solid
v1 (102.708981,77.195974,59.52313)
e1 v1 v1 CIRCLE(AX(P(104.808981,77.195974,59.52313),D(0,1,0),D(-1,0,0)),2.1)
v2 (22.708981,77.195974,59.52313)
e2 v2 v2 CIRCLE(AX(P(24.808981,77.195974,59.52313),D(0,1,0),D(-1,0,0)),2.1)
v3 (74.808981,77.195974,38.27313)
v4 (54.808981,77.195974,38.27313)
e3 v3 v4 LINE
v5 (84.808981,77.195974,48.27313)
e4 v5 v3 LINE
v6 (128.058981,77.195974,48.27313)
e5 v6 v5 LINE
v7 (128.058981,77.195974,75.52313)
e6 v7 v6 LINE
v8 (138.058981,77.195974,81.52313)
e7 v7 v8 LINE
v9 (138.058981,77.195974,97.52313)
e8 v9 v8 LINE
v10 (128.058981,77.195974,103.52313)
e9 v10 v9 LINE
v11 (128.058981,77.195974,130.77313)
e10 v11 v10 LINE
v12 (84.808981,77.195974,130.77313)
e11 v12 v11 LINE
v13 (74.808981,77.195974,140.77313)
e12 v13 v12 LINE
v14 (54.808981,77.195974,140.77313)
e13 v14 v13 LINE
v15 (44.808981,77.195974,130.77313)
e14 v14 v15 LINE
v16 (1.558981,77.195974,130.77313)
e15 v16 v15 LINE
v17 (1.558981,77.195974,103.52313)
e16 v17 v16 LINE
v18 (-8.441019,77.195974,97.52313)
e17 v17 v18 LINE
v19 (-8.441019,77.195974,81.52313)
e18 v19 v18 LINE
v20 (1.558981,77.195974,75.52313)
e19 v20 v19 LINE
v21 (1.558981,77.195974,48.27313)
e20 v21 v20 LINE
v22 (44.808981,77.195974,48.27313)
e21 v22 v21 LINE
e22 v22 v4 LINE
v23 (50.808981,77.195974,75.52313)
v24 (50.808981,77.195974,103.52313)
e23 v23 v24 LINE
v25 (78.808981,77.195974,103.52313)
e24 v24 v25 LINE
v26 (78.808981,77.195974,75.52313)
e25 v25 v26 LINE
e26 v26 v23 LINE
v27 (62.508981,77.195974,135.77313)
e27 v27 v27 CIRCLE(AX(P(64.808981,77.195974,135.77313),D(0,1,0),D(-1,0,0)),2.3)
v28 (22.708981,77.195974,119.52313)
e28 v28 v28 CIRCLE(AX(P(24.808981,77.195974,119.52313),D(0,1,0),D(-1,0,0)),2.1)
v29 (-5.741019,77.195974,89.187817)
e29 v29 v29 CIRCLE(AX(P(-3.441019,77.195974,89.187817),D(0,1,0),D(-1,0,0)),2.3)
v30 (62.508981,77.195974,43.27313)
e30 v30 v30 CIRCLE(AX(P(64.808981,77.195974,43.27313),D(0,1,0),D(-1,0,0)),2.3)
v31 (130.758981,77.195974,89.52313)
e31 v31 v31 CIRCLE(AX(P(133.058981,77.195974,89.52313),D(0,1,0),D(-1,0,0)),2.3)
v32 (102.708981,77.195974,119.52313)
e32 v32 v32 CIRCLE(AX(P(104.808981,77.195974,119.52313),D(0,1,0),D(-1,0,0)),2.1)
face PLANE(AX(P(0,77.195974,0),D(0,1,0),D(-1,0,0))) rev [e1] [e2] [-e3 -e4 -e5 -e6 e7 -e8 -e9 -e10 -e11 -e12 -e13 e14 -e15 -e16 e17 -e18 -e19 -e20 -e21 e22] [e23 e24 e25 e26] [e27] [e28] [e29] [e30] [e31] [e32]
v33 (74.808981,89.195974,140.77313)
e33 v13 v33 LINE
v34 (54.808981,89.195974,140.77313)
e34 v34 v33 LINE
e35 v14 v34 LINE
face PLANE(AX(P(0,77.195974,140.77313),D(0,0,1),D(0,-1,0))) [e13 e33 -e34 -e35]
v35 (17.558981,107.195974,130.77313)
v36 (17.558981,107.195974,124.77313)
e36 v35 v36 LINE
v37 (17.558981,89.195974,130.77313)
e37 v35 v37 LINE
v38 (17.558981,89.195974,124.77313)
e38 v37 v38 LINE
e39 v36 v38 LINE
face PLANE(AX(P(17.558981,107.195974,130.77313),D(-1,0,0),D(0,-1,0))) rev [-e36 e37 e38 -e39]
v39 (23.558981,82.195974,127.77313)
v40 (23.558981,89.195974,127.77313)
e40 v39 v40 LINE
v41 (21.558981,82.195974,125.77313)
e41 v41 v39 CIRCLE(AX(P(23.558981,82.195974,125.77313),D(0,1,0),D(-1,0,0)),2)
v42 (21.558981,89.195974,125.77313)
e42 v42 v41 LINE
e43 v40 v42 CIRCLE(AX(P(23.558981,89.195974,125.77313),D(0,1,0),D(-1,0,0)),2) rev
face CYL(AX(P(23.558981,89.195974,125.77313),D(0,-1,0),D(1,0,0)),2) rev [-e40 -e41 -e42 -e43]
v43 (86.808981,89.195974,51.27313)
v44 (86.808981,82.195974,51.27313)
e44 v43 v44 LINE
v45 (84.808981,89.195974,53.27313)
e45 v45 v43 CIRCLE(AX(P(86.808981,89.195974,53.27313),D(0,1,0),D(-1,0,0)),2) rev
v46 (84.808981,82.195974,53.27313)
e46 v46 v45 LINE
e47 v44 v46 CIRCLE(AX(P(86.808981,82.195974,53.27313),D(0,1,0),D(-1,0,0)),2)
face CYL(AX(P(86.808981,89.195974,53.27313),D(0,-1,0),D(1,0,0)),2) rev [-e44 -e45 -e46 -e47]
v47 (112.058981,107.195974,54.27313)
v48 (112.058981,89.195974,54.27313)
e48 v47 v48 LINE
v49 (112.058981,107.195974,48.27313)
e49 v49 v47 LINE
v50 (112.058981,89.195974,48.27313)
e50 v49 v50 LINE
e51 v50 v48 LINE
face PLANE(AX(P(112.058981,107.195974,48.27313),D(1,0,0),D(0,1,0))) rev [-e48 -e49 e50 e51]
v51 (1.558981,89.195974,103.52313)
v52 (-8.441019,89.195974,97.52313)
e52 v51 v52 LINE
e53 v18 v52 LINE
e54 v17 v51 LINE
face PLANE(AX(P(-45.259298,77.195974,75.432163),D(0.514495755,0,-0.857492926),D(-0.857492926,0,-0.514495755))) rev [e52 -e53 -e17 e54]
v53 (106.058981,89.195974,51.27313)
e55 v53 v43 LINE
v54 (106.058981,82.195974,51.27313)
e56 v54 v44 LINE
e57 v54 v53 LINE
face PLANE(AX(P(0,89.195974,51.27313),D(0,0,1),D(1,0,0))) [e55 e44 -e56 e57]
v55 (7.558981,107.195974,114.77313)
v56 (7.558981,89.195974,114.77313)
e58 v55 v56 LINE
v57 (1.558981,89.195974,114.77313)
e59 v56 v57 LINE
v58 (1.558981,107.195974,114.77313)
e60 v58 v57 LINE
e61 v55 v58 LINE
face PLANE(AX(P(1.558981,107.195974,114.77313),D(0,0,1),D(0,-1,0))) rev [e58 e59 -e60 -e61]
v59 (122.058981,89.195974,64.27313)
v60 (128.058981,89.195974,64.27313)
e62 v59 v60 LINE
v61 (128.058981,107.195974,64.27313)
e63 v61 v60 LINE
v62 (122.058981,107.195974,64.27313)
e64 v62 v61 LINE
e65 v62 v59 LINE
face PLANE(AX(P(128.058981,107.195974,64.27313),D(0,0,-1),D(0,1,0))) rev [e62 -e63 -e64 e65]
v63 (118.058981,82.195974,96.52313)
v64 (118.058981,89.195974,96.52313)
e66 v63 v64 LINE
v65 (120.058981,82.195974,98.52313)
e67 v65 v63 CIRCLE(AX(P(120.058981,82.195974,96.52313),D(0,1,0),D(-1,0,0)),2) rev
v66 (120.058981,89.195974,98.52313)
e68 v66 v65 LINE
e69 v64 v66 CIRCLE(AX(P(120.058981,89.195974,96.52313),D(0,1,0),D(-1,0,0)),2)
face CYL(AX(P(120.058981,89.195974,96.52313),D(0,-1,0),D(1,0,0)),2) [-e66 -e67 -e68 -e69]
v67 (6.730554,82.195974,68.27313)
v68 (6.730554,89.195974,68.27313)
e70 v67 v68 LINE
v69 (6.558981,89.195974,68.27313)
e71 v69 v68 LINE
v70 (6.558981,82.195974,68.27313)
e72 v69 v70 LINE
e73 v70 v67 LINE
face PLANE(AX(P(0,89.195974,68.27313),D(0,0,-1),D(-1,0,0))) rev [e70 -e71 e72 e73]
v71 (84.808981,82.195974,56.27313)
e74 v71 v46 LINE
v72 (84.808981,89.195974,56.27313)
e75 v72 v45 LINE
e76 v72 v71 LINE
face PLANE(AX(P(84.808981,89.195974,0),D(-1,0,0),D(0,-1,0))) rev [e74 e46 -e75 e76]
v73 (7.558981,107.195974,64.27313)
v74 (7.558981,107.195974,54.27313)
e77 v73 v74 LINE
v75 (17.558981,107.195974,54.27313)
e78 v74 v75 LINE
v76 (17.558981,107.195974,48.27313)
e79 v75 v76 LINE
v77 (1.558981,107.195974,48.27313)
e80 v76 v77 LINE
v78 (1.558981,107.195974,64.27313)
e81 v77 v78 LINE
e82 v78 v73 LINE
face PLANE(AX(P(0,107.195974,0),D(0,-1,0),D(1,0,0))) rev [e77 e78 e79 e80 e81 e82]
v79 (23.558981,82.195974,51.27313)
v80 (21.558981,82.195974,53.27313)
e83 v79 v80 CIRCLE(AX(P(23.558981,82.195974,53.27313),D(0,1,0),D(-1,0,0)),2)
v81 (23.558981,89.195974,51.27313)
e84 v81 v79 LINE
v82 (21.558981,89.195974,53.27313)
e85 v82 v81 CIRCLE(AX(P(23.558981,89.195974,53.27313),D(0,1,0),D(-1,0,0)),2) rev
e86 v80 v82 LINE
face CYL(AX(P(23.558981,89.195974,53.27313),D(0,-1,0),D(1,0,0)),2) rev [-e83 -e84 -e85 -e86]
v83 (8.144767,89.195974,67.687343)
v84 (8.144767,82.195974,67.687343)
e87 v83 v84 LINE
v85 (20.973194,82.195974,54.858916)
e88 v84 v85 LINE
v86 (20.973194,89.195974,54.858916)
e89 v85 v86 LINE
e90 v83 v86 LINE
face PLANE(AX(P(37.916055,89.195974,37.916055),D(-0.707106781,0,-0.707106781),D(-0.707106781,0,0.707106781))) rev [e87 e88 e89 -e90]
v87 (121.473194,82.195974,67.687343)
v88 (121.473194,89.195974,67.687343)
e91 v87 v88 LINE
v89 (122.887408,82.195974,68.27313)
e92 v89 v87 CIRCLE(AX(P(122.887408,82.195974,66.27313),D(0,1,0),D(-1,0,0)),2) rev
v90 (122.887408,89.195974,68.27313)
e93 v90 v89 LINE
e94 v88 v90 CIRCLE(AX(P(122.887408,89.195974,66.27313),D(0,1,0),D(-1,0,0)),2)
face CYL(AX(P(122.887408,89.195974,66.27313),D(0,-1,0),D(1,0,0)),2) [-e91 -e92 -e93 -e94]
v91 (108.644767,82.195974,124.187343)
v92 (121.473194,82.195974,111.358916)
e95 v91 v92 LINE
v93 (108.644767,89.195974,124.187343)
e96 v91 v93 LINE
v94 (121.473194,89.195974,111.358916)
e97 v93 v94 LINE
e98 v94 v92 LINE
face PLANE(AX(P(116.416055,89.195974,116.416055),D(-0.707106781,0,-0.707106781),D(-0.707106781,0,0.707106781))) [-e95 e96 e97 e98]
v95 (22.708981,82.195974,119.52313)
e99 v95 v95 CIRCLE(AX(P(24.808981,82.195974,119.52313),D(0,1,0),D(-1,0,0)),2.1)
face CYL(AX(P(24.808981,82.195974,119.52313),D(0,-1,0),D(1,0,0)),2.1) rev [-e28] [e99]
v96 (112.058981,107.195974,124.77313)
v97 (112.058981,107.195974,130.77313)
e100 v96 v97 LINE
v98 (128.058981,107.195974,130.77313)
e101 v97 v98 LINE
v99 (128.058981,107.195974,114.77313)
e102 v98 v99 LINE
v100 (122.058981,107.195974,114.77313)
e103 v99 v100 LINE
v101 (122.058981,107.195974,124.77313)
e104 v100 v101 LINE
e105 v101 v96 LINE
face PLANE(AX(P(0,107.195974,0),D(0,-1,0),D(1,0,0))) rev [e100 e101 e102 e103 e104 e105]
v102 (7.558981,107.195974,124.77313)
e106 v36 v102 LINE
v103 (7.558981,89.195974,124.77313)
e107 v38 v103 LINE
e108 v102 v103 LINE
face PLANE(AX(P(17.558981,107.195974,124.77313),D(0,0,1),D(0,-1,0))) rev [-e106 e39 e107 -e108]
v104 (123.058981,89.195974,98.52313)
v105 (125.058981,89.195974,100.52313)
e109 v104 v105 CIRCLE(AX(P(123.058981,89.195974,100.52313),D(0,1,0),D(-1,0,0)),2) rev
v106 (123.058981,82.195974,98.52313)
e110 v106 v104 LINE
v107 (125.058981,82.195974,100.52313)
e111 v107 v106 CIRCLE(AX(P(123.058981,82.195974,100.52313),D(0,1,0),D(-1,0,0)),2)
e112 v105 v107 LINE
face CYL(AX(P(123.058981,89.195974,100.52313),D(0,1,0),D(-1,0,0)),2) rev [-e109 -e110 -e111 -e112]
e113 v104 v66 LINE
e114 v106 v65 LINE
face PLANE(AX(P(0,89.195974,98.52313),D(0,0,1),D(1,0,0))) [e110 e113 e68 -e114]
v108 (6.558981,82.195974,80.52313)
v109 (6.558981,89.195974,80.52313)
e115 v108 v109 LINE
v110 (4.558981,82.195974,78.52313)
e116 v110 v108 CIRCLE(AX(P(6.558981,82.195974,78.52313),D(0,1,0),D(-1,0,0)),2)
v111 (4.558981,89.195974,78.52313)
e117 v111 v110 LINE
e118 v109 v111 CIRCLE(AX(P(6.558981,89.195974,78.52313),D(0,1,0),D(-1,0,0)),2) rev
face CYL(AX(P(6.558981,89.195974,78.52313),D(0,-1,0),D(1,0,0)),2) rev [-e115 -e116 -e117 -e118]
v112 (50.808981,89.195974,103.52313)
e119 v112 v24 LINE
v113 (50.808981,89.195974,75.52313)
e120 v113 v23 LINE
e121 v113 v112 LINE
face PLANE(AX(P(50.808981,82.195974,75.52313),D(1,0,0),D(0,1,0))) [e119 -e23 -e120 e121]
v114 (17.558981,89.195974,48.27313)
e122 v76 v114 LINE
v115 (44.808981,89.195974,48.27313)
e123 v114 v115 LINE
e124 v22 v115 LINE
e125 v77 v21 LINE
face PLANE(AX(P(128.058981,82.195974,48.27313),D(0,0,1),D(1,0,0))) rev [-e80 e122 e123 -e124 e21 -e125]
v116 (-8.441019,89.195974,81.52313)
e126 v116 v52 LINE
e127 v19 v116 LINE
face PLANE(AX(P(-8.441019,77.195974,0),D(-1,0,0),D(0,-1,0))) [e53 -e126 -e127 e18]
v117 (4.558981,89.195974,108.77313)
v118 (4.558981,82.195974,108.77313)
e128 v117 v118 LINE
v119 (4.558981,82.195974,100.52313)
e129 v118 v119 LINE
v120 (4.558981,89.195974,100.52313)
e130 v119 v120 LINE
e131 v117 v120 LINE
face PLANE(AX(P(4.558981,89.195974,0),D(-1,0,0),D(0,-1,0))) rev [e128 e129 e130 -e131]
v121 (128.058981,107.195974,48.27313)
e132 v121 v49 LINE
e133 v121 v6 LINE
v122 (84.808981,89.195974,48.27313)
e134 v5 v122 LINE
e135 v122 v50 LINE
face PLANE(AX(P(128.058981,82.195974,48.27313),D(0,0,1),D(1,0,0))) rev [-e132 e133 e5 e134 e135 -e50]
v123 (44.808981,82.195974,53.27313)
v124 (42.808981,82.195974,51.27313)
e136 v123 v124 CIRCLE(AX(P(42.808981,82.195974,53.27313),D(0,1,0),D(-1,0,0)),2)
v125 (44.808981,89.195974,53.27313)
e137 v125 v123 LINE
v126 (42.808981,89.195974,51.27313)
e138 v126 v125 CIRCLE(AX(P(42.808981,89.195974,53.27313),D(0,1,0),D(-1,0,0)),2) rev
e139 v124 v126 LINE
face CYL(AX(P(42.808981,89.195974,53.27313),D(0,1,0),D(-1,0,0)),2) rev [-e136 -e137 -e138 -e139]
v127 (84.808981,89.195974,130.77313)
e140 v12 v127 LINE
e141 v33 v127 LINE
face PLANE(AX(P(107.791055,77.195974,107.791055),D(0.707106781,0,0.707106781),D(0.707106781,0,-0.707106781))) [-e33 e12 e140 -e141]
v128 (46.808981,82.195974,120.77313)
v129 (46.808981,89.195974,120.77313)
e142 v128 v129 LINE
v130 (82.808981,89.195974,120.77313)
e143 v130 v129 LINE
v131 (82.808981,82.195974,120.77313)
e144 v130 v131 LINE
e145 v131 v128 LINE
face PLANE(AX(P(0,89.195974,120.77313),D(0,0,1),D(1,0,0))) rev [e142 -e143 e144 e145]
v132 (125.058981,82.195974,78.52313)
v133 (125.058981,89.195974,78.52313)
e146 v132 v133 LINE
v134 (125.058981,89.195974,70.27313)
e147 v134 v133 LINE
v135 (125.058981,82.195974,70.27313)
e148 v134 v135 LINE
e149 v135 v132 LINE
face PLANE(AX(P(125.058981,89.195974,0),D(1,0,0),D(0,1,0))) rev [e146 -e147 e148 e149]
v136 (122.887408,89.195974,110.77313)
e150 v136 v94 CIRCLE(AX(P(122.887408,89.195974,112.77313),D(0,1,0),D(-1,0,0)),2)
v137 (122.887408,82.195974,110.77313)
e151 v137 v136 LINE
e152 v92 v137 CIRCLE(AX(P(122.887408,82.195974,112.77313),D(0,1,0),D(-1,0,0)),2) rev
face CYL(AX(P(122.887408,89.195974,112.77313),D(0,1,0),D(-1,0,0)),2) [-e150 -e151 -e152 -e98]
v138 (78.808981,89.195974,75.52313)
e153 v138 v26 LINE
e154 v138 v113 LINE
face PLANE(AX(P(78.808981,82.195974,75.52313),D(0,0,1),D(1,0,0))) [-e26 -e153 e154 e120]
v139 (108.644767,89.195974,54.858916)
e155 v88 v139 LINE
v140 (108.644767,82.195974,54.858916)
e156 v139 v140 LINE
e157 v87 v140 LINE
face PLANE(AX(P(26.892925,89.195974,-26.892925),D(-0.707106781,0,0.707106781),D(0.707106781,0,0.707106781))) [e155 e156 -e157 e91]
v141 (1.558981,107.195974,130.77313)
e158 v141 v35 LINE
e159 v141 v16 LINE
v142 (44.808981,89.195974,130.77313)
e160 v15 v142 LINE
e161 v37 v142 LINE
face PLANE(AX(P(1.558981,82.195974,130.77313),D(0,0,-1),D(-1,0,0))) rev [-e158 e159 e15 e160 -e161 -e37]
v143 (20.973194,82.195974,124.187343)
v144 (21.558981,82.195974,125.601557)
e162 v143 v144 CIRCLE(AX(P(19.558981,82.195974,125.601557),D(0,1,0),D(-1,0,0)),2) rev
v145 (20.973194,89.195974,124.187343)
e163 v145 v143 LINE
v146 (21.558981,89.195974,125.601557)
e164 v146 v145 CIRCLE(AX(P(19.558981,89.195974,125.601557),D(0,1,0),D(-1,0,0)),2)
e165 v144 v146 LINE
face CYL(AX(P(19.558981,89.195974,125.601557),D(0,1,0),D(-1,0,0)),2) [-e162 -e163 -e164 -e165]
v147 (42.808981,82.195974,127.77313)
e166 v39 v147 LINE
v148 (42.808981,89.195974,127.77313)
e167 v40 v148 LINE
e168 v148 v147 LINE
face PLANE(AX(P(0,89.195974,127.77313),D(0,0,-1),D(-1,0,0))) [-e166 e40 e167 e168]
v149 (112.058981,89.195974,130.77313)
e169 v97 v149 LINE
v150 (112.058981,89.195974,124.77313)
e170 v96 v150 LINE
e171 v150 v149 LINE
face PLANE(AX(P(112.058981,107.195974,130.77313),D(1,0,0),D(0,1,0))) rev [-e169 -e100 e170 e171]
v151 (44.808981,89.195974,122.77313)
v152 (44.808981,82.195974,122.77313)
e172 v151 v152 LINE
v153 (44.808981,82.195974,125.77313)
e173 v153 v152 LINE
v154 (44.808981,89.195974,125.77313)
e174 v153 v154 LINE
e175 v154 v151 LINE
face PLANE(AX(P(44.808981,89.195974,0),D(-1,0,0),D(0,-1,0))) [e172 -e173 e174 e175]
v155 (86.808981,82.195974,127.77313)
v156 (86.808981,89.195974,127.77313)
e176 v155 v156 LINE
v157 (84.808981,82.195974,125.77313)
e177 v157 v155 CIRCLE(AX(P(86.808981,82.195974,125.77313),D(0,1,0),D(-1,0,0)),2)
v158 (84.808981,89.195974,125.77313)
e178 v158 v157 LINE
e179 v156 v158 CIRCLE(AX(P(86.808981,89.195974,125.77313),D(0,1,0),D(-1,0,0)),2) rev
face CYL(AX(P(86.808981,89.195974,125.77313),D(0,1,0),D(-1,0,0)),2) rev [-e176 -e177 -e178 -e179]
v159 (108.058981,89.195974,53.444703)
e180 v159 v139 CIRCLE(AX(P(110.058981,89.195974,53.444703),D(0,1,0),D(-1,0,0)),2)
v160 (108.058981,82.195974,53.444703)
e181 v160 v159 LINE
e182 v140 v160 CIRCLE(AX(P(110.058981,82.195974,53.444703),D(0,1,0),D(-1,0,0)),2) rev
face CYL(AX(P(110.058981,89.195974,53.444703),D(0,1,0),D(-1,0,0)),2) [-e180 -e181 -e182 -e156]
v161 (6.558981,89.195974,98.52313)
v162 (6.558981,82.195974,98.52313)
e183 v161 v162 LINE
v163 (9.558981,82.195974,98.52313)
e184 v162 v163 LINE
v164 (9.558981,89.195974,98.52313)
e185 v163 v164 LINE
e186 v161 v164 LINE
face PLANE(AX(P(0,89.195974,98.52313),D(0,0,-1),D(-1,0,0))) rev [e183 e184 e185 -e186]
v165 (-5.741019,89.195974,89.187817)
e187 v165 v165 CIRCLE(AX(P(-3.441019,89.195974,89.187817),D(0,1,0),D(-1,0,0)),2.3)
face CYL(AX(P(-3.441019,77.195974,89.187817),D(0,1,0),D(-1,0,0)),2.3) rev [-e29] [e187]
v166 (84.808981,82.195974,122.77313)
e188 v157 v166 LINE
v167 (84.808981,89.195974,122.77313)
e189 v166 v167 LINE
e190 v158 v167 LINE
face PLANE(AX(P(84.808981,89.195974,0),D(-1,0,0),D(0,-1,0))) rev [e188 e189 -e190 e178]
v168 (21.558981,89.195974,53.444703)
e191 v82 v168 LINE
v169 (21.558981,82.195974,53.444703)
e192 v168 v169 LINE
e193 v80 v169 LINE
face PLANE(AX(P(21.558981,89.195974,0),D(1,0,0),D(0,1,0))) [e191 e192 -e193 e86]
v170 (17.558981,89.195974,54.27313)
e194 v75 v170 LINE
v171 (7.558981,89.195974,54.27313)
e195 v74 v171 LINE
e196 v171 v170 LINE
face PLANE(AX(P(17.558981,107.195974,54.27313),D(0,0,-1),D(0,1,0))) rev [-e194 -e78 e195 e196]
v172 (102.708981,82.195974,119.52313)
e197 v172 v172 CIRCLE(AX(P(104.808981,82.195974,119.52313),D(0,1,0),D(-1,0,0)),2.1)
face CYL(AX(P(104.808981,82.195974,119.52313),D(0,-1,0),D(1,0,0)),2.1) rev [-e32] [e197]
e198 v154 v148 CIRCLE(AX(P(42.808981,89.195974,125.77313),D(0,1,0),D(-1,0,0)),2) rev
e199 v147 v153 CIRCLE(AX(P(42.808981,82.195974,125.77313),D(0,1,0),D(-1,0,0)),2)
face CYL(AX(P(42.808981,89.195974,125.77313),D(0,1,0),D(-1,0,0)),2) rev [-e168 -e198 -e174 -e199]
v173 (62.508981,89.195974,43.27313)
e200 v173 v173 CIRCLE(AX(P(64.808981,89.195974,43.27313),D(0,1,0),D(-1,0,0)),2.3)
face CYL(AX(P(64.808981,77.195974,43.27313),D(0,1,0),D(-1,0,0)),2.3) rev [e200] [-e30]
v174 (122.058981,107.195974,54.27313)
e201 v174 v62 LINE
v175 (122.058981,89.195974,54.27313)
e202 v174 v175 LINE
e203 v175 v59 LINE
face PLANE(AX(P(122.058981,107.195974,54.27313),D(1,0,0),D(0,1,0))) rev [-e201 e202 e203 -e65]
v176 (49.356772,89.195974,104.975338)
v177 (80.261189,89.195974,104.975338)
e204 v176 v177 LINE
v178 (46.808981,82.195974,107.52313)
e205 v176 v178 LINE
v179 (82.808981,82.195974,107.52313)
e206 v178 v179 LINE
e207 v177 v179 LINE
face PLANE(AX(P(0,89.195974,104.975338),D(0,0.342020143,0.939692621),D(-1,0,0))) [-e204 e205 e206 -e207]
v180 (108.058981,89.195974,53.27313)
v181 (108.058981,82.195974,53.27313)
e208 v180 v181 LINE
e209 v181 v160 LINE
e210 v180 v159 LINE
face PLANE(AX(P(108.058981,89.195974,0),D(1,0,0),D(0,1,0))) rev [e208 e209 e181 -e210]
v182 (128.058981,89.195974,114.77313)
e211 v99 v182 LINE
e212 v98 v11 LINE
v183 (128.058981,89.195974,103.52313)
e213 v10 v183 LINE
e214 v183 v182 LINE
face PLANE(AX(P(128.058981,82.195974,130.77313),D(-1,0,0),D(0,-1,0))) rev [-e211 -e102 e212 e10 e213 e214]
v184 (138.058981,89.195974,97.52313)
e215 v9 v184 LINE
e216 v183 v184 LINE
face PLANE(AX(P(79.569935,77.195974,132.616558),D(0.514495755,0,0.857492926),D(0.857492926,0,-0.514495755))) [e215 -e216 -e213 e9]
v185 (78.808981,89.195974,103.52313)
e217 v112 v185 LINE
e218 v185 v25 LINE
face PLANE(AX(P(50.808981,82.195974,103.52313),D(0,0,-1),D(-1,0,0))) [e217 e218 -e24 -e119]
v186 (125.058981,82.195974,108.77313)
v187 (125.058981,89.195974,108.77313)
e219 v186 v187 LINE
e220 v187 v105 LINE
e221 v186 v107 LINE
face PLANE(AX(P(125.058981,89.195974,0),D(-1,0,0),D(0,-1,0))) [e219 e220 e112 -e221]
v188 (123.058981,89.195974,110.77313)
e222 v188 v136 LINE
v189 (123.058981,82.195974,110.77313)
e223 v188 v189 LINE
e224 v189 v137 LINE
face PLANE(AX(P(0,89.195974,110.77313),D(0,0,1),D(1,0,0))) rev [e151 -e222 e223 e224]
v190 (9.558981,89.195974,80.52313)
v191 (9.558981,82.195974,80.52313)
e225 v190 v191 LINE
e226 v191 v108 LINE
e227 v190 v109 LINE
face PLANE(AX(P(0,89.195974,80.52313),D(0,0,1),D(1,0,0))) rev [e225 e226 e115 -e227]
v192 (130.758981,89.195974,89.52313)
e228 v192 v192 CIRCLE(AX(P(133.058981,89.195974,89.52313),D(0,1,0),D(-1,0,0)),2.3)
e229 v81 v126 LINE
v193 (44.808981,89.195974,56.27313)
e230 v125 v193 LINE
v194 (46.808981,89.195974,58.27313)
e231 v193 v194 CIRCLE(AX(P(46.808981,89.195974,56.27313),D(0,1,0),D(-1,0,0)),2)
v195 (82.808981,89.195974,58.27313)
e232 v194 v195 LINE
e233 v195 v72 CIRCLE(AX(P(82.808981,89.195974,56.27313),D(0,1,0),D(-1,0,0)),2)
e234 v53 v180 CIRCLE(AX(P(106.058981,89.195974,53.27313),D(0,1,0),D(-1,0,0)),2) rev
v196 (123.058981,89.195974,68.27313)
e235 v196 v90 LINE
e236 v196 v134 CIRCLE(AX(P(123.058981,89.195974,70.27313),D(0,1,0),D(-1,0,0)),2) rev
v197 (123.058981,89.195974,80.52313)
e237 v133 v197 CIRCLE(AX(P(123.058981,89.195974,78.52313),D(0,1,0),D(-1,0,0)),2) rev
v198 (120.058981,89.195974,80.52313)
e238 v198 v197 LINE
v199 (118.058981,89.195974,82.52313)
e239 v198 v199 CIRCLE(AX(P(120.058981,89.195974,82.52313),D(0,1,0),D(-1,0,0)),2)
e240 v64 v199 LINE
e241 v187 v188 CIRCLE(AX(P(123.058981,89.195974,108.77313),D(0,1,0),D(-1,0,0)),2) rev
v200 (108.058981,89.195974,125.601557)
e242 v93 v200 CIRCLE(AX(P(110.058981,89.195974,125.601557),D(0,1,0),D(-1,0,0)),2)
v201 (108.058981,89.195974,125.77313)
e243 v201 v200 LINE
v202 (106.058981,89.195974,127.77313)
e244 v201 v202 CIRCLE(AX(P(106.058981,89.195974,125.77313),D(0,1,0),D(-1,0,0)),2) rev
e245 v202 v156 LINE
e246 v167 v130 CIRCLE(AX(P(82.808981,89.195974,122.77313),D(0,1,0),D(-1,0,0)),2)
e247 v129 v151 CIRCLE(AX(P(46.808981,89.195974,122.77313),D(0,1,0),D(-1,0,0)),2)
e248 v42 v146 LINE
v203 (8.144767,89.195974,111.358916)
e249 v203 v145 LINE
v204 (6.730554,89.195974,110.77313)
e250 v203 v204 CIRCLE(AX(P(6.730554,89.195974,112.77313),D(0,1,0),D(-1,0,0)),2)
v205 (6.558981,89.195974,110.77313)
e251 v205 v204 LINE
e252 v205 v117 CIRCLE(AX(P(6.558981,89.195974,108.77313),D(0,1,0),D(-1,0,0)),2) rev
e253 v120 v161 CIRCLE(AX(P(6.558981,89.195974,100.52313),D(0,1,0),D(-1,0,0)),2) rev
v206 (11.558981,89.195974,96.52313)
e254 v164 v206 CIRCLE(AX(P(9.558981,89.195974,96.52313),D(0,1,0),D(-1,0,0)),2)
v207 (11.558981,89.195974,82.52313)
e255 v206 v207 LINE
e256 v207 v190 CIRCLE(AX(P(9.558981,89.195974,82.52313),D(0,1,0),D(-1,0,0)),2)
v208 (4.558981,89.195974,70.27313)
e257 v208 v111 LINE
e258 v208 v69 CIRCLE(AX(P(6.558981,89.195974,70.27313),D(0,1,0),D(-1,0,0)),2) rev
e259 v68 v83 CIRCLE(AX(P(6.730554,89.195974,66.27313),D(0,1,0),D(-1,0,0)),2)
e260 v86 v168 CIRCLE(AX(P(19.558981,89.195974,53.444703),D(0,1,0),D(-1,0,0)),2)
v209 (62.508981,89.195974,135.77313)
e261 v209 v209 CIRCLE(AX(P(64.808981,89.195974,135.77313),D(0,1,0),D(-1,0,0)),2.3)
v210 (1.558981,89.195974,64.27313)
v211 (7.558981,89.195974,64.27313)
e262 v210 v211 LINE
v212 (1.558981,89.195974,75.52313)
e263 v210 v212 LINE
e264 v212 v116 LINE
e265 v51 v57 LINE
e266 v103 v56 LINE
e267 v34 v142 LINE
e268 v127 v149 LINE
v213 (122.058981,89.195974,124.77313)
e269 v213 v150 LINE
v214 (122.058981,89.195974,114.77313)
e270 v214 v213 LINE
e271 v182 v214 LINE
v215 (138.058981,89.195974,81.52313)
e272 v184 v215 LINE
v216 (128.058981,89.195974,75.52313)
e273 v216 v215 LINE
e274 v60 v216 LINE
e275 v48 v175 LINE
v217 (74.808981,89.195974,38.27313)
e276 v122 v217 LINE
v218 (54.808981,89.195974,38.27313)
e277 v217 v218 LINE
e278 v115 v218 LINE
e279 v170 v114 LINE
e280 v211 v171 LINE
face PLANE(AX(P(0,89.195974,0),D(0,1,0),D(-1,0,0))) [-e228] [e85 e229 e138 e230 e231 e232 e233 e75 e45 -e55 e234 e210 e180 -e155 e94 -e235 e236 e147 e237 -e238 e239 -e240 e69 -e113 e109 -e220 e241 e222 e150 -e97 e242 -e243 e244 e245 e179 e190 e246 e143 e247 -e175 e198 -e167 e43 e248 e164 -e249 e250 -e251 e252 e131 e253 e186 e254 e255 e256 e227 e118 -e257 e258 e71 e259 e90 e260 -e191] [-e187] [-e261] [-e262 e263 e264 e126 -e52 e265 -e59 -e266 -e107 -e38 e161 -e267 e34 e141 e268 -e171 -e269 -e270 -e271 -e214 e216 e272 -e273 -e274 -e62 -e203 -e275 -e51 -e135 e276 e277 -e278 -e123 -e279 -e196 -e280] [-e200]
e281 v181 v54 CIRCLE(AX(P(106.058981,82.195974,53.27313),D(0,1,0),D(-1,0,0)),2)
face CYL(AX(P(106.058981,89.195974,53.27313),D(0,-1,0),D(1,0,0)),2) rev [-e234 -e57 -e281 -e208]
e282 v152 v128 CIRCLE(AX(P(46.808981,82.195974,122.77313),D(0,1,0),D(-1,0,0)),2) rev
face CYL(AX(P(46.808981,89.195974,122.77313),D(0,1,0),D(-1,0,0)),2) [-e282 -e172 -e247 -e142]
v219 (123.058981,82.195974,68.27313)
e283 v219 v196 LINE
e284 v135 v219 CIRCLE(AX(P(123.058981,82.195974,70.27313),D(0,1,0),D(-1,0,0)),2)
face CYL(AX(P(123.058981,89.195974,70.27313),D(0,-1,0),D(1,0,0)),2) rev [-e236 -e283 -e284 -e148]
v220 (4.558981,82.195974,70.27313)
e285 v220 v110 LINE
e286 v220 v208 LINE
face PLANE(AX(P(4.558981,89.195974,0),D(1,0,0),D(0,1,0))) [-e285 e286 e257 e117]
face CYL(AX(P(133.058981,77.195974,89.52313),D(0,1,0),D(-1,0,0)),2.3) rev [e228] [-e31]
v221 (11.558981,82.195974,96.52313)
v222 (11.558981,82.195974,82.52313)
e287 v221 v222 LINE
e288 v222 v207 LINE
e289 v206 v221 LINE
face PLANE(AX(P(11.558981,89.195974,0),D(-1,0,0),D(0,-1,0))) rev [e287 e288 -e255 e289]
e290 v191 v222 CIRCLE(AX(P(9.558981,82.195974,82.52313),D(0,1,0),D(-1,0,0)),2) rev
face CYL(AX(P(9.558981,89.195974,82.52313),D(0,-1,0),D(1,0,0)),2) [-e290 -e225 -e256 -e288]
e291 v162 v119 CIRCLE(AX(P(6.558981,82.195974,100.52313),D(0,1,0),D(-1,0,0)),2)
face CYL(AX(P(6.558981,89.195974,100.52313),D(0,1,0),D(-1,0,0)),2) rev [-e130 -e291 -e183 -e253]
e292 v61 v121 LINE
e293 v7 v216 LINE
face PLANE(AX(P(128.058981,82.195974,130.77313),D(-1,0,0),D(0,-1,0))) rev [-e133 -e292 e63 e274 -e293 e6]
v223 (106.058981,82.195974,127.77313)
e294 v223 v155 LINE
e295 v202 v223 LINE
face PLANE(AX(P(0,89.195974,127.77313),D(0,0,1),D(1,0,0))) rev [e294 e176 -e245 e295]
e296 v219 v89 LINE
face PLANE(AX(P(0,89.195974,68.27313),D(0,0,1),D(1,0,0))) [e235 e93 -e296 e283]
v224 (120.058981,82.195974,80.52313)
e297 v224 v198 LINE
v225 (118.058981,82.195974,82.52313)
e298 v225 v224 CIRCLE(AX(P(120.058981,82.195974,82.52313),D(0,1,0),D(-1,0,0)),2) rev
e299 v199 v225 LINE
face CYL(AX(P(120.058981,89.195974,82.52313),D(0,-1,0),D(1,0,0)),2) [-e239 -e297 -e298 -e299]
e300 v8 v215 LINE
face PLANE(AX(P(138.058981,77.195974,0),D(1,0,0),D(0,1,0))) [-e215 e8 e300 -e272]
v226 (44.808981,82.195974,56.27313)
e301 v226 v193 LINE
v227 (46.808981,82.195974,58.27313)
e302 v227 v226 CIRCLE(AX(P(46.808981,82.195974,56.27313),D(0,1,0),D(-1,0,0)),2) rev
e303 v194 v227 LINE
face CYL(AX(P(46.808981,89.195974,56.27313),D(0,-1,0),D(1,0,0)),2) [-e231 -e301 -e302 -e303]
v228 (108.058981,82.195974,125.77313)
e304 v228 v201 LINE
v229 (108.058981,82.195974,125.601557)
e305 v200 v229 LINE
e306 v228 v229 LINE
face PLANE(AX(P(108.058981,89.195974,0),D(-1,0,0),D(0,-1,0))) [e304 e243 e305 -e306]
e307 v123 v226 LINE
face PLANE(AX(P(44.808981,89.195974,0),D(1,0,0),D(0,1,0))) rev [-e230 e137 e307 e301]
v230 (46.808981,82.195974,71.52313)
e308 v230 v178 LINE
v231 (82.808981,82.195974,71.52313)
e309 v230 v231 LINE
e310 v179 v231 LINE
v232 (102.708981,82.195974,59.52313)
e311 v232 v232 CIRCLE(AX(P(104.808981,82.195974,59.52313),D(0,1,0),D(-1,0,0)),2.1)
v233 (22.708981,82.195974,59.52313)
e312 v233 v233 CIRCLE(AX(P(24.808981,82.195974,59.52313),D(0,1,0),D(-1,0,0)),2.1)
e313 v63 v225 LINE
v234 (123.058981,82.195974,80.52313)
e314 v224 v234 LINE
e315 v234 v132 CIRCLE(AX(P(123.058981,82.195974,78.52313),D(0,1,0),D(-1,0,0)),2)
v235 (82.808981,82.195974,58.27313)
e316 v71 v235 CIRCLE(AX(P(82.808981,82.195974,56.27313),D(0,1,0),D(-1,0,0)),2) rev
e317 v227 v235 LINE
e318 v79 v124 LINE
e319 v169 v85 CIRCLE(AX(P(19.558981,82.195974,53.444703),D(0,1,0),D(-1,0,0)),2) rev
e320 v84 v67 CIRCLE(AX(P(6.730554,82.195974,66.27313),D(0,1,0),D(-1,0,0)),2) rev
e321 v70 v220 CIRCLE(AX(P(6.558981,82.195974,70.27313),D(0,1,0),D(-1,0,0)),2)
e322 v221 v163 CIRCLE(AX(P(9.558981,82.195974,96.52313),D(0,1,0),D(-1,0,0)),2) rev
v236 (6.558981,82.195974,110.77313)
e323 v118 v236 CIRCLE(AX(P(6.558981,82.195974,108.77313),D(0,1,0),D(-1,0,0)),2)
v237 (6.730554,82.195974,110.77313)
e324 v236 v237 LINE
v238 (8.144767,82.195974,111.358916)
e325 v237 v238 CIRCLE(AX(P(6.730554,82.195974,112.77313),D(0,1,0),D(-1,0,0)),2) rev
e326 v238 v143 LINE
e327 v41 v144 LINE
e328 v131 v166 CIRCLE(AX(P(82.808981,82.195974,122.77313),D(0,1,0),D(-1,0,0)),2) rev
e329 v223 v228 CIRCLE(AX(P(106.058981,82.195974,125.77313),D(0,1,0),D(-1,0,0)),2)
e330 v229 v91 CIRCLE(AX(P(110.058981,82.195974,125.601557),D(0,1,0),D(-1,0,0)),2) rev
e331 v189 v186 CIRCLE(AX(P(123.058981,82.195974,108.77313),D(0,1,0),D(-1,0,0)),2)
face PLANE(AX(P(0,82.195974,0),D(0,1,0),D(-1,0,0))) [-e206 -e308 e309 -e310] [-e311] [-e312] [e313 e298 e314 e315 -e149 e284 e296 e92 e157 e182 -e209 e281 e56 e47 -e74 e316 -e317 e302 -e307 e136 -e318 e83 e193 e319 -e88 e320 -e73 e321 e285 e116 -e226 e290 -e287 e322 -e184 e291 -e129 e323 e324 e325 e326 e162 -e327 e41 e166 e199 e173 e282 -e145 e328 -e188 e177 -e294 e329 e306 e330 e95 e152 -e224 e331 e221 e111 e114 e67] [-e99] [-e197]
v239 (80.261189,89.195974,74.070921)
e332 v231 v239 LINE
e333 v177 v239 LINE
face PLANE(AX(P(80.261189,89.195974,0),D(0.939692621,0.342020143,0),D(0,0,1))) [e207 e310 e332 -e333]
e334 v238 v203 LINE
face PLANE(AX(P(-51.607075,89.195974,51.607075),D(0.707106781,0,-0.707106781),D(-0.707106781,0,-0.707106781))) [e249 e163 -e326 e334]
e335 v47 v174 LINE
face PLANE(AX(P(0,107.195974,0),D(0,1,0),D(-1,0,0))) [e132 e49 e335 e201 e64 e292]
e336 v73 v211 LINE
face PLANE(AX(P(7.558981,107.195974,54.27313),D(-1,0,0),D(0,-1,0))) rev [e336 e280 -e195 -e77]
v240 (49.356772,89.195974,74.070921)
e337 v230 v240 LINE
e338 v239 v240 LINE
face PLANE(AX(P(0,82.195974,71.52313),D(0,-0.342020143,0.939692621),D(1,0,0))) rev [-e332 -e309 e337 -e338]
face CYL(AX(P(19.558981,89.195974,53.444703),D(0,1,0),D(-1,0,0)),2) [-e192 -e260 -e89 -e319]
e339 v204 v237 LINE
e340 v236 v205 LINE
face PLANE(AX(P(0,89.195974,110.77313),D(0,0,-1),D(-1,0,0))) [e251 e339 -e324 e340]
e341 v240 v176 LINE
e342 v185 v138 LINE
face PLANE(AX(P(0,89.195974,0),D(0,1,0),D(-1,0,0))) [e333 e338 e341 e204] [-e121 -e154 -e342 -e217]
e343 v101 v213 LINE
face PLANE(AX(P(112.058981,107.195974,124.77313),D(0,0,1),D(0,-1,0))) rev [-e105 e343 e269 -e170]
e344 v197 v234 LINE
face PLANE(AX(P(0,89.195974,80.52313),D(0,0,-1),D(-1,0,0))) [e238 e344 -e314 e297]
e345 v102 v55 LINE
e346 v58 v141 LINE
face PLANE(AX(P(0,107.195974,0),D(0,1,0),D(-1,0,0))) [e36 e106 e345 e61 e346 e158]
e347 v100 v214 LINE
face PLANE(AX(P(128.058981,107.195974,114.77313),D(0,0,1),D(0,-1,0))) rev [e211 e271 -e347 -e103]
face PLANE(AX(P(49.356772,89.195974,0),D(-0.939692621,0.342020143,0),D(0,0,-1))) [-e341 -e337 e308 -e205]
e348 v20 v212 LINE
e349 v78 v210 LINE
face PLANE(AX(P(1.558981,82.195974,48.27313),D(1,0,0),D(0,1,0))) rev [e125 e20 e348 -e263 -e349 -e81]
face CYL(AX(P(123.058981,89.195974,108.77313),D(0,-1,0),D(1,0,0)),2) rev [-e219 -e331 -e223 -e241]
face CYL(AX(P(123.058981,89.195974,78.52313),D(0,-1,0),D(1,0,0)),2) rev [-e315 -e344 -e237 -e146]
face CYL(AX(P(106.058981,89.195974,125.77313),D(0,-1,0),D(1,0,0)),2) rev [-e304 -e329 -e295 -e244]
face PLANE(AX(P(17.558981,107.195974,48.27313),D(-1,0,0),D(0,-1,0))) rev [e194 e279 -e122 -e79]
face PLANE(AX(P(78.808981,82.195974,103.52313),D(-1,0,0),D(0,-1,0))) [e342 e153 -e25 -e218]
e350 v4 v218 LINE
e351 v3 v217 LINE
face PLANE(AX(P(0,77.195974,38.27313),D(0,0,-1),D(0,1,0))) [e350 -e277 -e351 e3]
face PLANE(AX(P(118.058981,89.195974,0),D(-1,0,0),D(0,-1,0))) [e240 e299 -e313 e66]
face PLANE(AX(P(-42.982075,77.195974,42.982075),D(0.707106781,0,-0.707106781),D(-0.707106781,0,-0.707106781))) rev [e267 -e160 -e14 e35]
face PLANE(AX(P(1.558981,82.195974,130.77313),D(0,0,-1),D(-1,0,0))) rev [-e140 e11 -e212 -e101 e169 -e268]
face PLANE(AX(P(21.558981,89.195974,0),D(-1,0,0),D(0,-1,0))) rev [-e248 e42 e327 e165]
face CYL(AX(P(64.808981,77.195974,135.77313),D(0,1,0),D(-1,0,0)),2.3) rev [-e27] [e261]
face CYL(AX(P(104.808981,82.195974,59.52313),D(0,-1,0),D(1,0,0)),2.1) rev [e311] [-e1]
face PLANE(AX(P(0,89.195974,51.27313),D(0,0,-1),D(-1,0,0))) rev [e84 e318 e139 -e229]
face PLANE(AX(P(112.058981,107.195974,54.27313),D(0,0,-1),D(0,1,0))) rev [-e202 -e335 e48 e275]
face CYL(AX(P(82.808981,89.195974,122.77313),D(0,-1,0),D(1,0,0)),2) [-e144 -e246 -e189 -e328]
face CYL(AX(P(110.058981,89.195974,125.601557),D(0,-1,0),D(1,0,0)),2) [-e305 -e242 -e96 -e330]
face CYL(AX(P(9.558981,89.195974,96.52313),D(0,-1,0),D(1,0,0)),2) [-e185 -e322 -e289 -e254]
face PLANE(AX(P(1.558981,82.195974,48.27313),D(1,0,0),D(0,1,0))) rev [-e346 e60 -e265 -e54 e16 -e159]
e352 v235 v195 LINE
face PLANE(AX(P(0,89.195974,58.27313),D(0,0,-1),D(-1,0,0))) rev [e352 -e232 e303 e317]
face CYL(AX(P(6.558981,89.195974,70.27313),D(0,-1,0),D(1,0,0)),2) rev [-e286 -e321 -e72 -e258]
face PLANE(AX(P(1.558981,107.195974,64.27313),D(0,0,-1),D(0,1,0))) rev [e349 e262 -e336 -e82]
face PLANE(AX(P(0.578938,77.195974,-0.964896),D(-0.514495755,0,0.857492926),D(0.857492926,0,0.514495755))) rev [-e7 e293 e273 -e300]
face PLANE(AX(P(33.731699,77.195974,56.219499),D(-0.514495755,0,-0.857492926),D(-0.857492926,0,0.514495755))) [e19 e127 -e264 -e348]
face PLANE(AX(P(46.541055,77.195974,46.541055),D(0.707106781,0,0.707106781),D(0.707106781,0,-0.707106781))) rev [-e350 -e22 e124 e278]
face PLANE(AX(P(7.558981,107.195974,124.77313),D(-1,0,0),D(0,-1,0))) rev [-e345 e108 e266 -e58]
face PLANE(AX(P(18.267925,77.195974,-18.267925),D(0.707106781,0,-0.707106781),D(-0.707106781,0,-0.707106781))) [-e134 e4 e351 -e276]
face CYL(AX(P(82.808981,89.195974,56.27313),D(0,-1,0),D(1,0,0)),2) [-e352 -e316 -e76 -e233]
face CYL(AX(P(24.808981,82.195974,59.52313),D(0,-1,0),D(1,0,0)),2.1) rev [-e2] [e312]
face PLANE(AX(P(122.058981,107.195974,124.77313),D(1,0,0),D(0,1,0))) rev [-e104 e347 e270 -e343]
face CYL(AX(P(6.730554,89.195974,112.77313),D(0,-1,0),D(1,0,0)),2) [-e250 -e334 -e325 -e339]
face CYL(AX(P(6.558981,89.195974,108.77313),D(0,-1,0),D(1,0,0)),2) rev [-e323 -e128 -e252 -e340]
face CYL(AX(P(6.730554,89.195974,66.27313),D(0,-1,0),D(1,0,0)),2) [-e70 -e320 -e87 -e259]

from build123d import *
from OCP.BRepFilletAPI import BRepFilletAPI_MakeChamfer

# Parameters (mm, degrees)
SKETCH_1_W       = 126.5
SKETCH_1_H       = 82.5
SKETCH_1_R       = 2.1
SKETCH_1_W_2     = 28
SKETCH_1_H_2     = 28
EXTRUDE_1_DEPTH  = 5
SKETCH_2_W       = 23.25
SKETCH_2_H       = 3
SKETCH_2_W_2     = 40
SKETCH_2_H_2     = 10
SKETCH_2_W_3     = 3
SKETCH_2_H_3     = 12.25
SKETCH_2_W_4     = 10
SKETCH_2_H_4     = 18
SKETCH_2_W_5     = 36
SKETCH_2_H_5     = 36
SKETCH_2_W_6     = 28
SKETCH_2_H_6     = 28
EXTRUDE_2_DEPTH  = 7
CHAMFER_1_SIZE   = 2.54779164
CHAMFER_1_SIZE_2 = 7
FILLET_1_R       = 2
EXTRUDE_3_DEPTH  = 18
SKETCH_4_W       = 20
SKETCH_4_H       = 10
SKETCH_4_R       = 2.3
SKETCH_4_W_2     = 10
SKETCH_4_H_2     = 16
EXTRUDE_4_DEPTH  = 12


with BuildPart() as part:
    # Эскиз1 → Бобышка-Вытянуть1 (new body)
    with BuildSketch(Plane(origin=(0, 77.195974268, 0), x_dir=(1, 0, 0), z_dir=(0, 1, 0))):
        with Locations((64.808980694, -89.523129836)):
            Rectangle(SKETCH_1_W, SKETCH_1_H)
        with Locations(Location((24.808980694, -59.523129836, 0), (0, 0, 180))):
            Circle(SKETCH_1_R, mode=Mode.SUBTRACT)
        with Locations(Location((104.808980694, -59.523129836, 0), (0, 0, 180))):
            Circle(SKETCH_1_R, mode=Mode.SUBTRACT)
        with Locations(Location((104.808980694, -119.523129836, 0), (0, 0, 180))):
            Circle(SKETCH_1_R, mode=Mode.SUBTRACT)
        with Locations(Location((24.808980694, -119.523129836, 0), (0, 0, 180))):
            Circle(SKETCH_1_R, mode=Mode.SUBTRACT)
        with Locations((64.808980694, -89.523129836)):
            Rectangle(SKETCH_1_W_2, SKETCH_1_H_2, mode=Mode.SUBTRACT)
    extrude(amount=EXTRUDE_1_DEPTH)

    # Эскиз2 → Бобышка-Вытянуть2 (add)
    # profile 1 of 17: a face of its own
    with BuildSketch(Plane(origin=(0, 82.195974268, 0), x_dir=(1, 0, 0), z_dir=(0, 1, 0))):
        Polygon((1.558980694, -68.273129836), (7.558980694, -68.273129836), (21.558980694, -54.273129836), (21.558980694, -48.273129836), (1.558980694, -48.273129836), align=None)
    # profile 2 of 17: a face of its own
    with BuildSketch(Plane(origin=(0, 82.195974268, 0), x_dir=(1, 0, 0), z_dir=(0, 1, 0))):
        with Locations((33.183980694, -49.773129836)):
            Rectangle(SKETCH_2_W, SKETCH_2_H)
    # profile 3 of 17: a face of its own
    with BuildSketch(Plane(origin=(0, 82.195974268, 0), x_dir=(1, 0, 0), z_dir=(0, 1, 0))):
        with Locations((64.808980694, -53.273129836)):
            Rectangle(SKETCH_2_W_2, SKETCH_2_H_2)
    # profile 4 of 17: a face of its own
    with BuildSketch(Plane(origin=(0, 82.195974268, 0), x_dir=(1, 0, 0), z_dir=(0, 1, 0))):
        with Locations((96.433980694, -49.773129836)):
            Rectangle(SKETCH_2_W, SKETCH_2_H)
    # profile 5 of 17: a face of its own
    with BuildSketch(Plane(origin=(0, 82.195974268, 0), x_dir=(1, 0, 0), z_dir=(0, 1, 0))):
        Polygon((122.058980694, -68.273129836), (108.058980694, -54.273129836), (108.058980694, -48.273129836), (128.058980694, -48.273129836), (128.058980694, -68.273129836), align=None)
    # profile 6 of 17: a face of its own
    with BuildSketch(Plane(origin=(0, 82.195974268, 0), x_dir=(1, 0, 0), z_dir=(0, 1, 0))):
        with Locations((126.558980694, -74.398129836)):
            Rectangle(SKETCH_2_W_3, SKETCH_2_H_3)
    # profile 7 of 17: a face of its own
    with BuildSketch(Plane(origin=(0, 82.195974268, 0), x_dir=(1, 0, 0), z_dir=(0, 1, 0))):
        with Locations((123.058980694, -89.523129836)):
            Rectangle(SKETCH_2_W_4, SKETCH_2_H_4)
    # profile 8 of 17: a face of its own
    with BuildSketch(Plane(origin=(0, 82.195974268, 0), x_dir=(1, 0, 0), z_dir=(0, 1, 0))):
        with Locations((126.558980694, -104.648129836)):
            Rectangle(SKETCH_2_W_3, SKETCH_2_H_3)
    # profile 9 of 17: a face of its own
    with BuildSketch(Plane(origin=(0, 82.195974268, 0), x_dir=(1, 0, 0), z_dir=(0, 1, 0))):
        Polygon((108.058980694, -124.773129836), (122.058980694, -110.773129836), (128.058980694, -110.773129836), (128.058980694, -130.773129836), (108.058980694, -130.773129836), align=None)
    # profile 10 of 17: a face of its own
    with BuildSketch(Plane(origin=(0, 82.195974268, 0), x_dir=(1, 0, 0), z_dir=(0, 1, 0))):
        with Locations((96.433980694, -129.273129836)):
            Rectangle(SKETCH_2_W, SKETCH_2_H)
    # profile 11 of 17: a face of its own
    with BuildSketch(Plane(origin=(0, 82.195974268, 0), x_dir=(1, 0, 0), z_dir=(0, 1, 0))):
        with Locations((64.808980694, -89.523129836)):
            Rectangle(SKETCH_2_W_5, SKETCH_2_H_5)
        with Locations((64.808980694, -89.523129836)):
            Rectangle(SKETCH_2_W_6, SKETCH_2_H_6, mode=Mode.SUBTRACT)
    # profile 12 of 17: a face of its own
    with BuildSketch(Plane(origin=(0, 82.195974268, 0), x_dir=(1, 0, 0), z_dir=(0, 1, 0))):
        with Locations((64.808980694, -125.773129836)):
            Rectangle(SKETCH_2_W_2, SKETCH_2_H_2)
    # profile 13 of 17: a face of its own
    with BuildSketch(Plane(origin=(0, 82.195974268, 0), x_dir=(1, 0, 0), z_dir=(0, 1, 0))):
        with Locations((33.183980694, -129.273129836)):
            Rectangle(SKETCH_2_W, SKETCH_2_H)
    # profile 14 of 17: a face of its own
    with BuildSketch(Plane(origin=(0, 82.195974268, 0), x_dir=(1, 0, 0), z_dir=(0, 1, 0))):
        Polygon((7.558980694, -110.773129836), (21.558980694, -124.773129836), (21.558980694, -130.773129836), (1.558980694, -130.773129836), (1.558980694, -110.773129836), align=None)
    # profile 15 of 17: a face of its own
    with BuildSketch(Plane(origin=(0, 82.195974268, 0), x_dir=(1, 0, 0), z_dir=(0, 1, 0))):
        with Locations((3.058980694, -104.648129836)):
            Rectangle(SKETCH_2_W_3, SKETCH_2_H_3)
    # profile 16 of 17: a face of its own
    with BuildSketch(Plane(origin=(0, 82.195974268, 0), x_dir=(1, 0, 0), z_dir=(0, 1, 0))):
        with Locations((6.558980694, -89.523129836)):
            Rectangle(SKETCH_2_W_4, SKETCH_2_H_4)
    # profile 17 of 17: a face of its own
    with BuildSketch(Plane(origin=(0, 82.195974268, 0), x_dir=(1, 0, 0), z_dir=(0, 1, 0))):
        with Locations((3.058980694, -74.398129836)):
            Rectangle(SKETCH_2_W_3, SKETCH_2_H_3)
    extrude(amount=EXTRUDE_2_DEPTH)

    # Фаска1
    chamfer_1_edges_1 = [part.edges().sort_by_distance(p)[0] for p in [
        (82.808980694, 89.195974268, 89.523129836),
    ]]
    chamfer_1_side_1 = [part.faces().sort_by_distance(p)[0] for p in [
        (82.758024861, 89.195974268, 89.523129836),
    ]]
    chamfer_1_edges_2 = [part.edges().sort_by_distance(p)[0] for p in [
        (64.808980694, 89.195974268, 71.523129836),
    ]]
    chamfer_1_side_2 = [part.faces().sort_by_distance(p)[0] for p in [
        (64.808980694, 89.195974268, 71.574085669),
    ]]
    chamfer_1_edges_3 = [part.edges().sort_by_distance(p)[0] for p in [
        (46.808980694, 89.195974268, 89.523129836),
    ]]
    chamfer_1_side_3 = [part.faces().sort_by_distance(p)[0] for p in [
        (46.859936527, 89.195974268, 89.523129836),
    ]]
    chamfer_1_edges_4 = [part.edges().sort_by_distance(p)[0] for p in [
        (64.808980694, 89.195974268, 107.523129836),
    ]]
    chamfer_1_side_4 = [part.faces().sort_by_distance(p)[0] for p in [
        (64.808980694, 89.195974268, 107.472174004),
    ]]
    chamfer_1 = BRepFilletAPI_MakeChamfer(part.part.solid().wrapped)
    for e in chamfer_1_edges_1:
        chamfer_1.Add(CHAMFER_1_SIZE - 0.0001, CHAMFER_1_SIZE_2 - 0.0001, e.wrapped, chamfer_1_side_1[0].wrapped)
    for e in chamfer_1_edges_2:
        chamfer_1.Add(CHAMFER_1_SIZE - 0.0001, CHAMFER_1_SIZE_2 - 0.0001, e.wrapped, chamfer_1_side_2[0].wrapped)
    for e in chamfer_1_edges_3:
        chamfer_1.Add(CHAMFER_1_SIZE - 0.0001, CHAMFER_1_SIZE_2 - 0.0001, e.wrapped, chamfer_1_side_3[0].wrapped)
    for e in chamfer_1_edges_4:
        chamfer_1.Add(CHAMFER_1_SIZE - 0.0001, CHAMFER_1_SIZE_2 - 0.0001, e.wrapped, chamfer_1_side_4[0].wrapped)
    add(Compound.cast(chamfer_1.Shape()), mode=Mode.REPLACE)  # a hair under: the kernel refuses the full size

    # Скругление1
    fillet_1_edges = [part.edges().sort_by_distance(p)[0] for p in [
        (108.058980694, 85.695974268, 124.773129836),
        (108.058980694, 85.695974268, 127.773129836),
        (84.808980694, 85.695974268, 127.773129836),
        (84.808980694, 85.695974268, 120.773129836),
        (44.808980694, 85.695974268, 120.773129836),
        (44.808980694, 85.695974268, 127.773129836),
        (21.558980694, 85.695974268, 127.773129836),
        (21.558980694, 85.695974268, 124.773129836),
        (7.558980694, 85.695974268, 110.773129836),
        (4.558980694, 85.695974268, 110.773129836),
        (4.558980694, 85.695974268, 98.523129836),
        (11.558980694, 85.695974268, 98.523129836),
        (11.558980694, 85.695974268, 80.523129836),
        (4.558980694, 85.695974268, 80.523129836),
        (4.558980694, 85.695974268, 68.273129836),
        (7.558980694, 85.695974268, 68.273129836),
        (21.558980694, 85.695974268, 54.273129836),
        (21.558980694, 85.695974268, 51.273129836),
        (44.808980694, 85.695974268, 51.273129836),
        (44.808980694, 85.695974268, 58.273129836),
        (84.808980694, 85.695974268, 58.273129836),
        (84.808980694, 85.695974268, 51.273129836),
        (108.058980694, 85.695974268, 51.273129836),
        (108.058980694, 85.695974268, 54.273129836),
        (122.058980694, 85.695974268, 68.273129836),
        (125.058980694, 85.695974268, 68.273129836),
        (125.058980694, 85.695974268, 80.523129836),
        (118.058980694, 85.695974268, 80.523129836),
        (118.058980694, 85.695974268, 98.523129836),
        (125.058980694, 85.695974268, 98.523129836),
        (125.058980694, 85.695974268, 110.773129836),
        (122.058980694, 85.695974268, 110.773129836),
    ]]
    fillet(fillet_1_edges, radius=FILLET_1_R)

    # Эскиз3 → Бобышка-Вытянуть3 (add)
    with BuildSketch(Plane(origin=(0, 89.195974268, 0), x_dir=(1, 0, 0), z_dir=(0, 1, 0))):
        Polygon((1.558980694, -48.273129836), (1.558980694, -64.273129836), (7.558980694, -64.273129836), (7.558980694, -54.273129836), (17.558980694, -54.273129836), (17.558980694, -48.273129836), align=None)
        Polygon((1.558980694, -130.773129836), (1.558980694, -114.773129836), (7.558980694, -114.773129836), (7.558980694, -124.773129836), (17.558980694, -124.773129836), (17.558980694, -130.773129836), align=None)
        Polygon((128.058980694, -48.273129836), (128.058980694, -64.273129836), (122.058980694, -64.273129836), (122.058980694, -54.273129836), (112.058980694, -54.273129836), (112.058980694, -48.273129836), align=None)
        Polygon((128.058980694, -130.773129836), (128.058980694, -114.773129836), (122.058980694, -114.773129836), (122.058980694, -124.773129836), (112.058980694, -124.773129836), (112.058980694, -130.773129836), align=None)
    extrude(amount=EXTRUDE_3_DEPTH)

    # Эскиз4 → Бобышка-Вытянуть4 (add)
    # profile 1 of 12: a face of its own
    with BuildSketch(Plane(origin=(0, 89.195974268, 0), x_dir=(1, 0, 0), z_dir=(0, 1, 0))):
        Polygon((54.808980694, -140.773129836), (44.808980694, -130.773129836), (54.808980694, -130.773129836), align=None)
    # profile 2 of 12: a face of its own
    with BuildSketch(Plane(origin=(0, 89.195974268, 0), x_dir=(1, 0, 0), z_dir=(0, 1, 0))):
        with Locations((64.808980694, -135.773129836)):
            Rectangle(SKETCH_4_W, SKETCH_4_H)
        with Locations(Location((64.808980694, -135.773129836, 0), (0, 0, 180))):
            Circle(SKETCH_4_R, mode=Mode.SUBTRACT)
    # profile 3 of 12: a face of its own
    with BuildSketch(Plane(origin=(0, 89.195974268, 0), x_dir=(1, 0, 0), z_dir=(0, 1, 0))):
        Polygon((74.808980694, -140.773129836), (74.808980694, -130.773129836), (84.808980694, -130.773129836), align=None)
    # profile 4 of 12: a face of its own
    with BuildSketch(Plane(origin=(0, 89.195974268, 0), x_dir=(1, 0, 0), z_dir=(0, 1, 0))):
        Polygon((44.808980694, -48.273129836), (54.808980694, -38.273129836), (54.808980694, -48.273129836), align=None)
    # profile 5 of 12: a face of its own
    with BuildSketch(Plane(origin=(0, 89.195974268, 0), x_dir=(1, 0, 0), z_dir=(0, 1, 0))):
        with Locations((64.808980694, -43.273129836)):
            Rectangle(SKETCH_4_W, SKETCH_4_H)
        with Locations(Location((64.808980694, -43.273129836, 0), (0, 0, 180))):
            Circle(SKETCH_4_R, mode=Mode.SUBTRACT)
    # profile 6 of 12: a face of its own
    with BuildSketch(Plane(origin=(0, 89.195974268, 0), x_dir=(1, 0, 0), z_dir=(0, 1, 0))):
        Polygon((74.808980694, -48.273129836), (84.808980694, -48.273129836), (74.808980694, -38.273129836), align=None)
    # profile 7 of 12: a face of its own
    with BuildSketch(Plane(origin=(0, 89.195974268, 0), x_dir=(1, 0, 0), z_dir=(0, 1, 0))):
        Polygon((1.558980694, -81.523129836), (1.558980694, -75.523129836), (-8.441019306, -81.523129836), align=None)
    # profile 8 of 12: a face of its own
    with BuildSketch(Plane(origin=(0, 89.195974268, 0), x_dir=(1, 0, 0), z_dir=(0, 1, 0))):
        with Locations((-3.441019306, -89.523129836)):
            Rectangle(SKETCH_4_W_2, SKETCH_4_H_2)
        with Locations(Location((-3.441019306, -89.187817333, 0), (0, 0, 180))):
            Circle(SKETCH_4_R, mode=Mode.SUBTRACT)
    # profile 9 of 12: a face of its own
    with BuildSketch(Plane(origin=(0, 89.195974268, 0), x_dir=(1, 0, 0), z_dir=(0, 1, 0))):
        Polygon((1.558980694, -103.523129836), (-8.441019306, -97.523129836), (1.558980694, -97.523129836), align=None)
    # profile 10 of 12: a face of its own
    with BuildSketch(Plane(origin=(0, 89.195974268, 0), x_dir=(1, 0, 0), z_dir=(0, 1, 0))):
        Polygon((128.058980694, -81.523129836), (128.058980694, -75.523129836), (138.058980694, -81.523129836), align=None)
    # profile 11 of 12: a face of its own
    with BuildSketch(Plane(origin=(0, 89.195974268, 0), x_dir=(1, 0, 0), z_dir=(0, 1, 0))):
        with Locations((133.058980694, -89.523129836)):
            Rectangle(SKETCH_4_W_2, SKETCH_4_H_2)
        with Locations(Location((133.058980694, -89.523129836, 0), (0, 0, 180))):
            Circle(SKETCH_4_R, mode=Mode.SUBTRACT)
    # profile 12 of 12: a face of its own
    with BuildSketch(Plane(origin=(0, 89.195974268, 0), x_dir=(1, 0, 0), z_dir=(0, 1, 0))):
        Polygon((128.058980694, -97.523129836), (128.058980694, -103.523129836), (138.058980694, -97.523129836), align=None)
    extrude(amount=-EXTRUDE_4_DEPTH)


solid = part.part
